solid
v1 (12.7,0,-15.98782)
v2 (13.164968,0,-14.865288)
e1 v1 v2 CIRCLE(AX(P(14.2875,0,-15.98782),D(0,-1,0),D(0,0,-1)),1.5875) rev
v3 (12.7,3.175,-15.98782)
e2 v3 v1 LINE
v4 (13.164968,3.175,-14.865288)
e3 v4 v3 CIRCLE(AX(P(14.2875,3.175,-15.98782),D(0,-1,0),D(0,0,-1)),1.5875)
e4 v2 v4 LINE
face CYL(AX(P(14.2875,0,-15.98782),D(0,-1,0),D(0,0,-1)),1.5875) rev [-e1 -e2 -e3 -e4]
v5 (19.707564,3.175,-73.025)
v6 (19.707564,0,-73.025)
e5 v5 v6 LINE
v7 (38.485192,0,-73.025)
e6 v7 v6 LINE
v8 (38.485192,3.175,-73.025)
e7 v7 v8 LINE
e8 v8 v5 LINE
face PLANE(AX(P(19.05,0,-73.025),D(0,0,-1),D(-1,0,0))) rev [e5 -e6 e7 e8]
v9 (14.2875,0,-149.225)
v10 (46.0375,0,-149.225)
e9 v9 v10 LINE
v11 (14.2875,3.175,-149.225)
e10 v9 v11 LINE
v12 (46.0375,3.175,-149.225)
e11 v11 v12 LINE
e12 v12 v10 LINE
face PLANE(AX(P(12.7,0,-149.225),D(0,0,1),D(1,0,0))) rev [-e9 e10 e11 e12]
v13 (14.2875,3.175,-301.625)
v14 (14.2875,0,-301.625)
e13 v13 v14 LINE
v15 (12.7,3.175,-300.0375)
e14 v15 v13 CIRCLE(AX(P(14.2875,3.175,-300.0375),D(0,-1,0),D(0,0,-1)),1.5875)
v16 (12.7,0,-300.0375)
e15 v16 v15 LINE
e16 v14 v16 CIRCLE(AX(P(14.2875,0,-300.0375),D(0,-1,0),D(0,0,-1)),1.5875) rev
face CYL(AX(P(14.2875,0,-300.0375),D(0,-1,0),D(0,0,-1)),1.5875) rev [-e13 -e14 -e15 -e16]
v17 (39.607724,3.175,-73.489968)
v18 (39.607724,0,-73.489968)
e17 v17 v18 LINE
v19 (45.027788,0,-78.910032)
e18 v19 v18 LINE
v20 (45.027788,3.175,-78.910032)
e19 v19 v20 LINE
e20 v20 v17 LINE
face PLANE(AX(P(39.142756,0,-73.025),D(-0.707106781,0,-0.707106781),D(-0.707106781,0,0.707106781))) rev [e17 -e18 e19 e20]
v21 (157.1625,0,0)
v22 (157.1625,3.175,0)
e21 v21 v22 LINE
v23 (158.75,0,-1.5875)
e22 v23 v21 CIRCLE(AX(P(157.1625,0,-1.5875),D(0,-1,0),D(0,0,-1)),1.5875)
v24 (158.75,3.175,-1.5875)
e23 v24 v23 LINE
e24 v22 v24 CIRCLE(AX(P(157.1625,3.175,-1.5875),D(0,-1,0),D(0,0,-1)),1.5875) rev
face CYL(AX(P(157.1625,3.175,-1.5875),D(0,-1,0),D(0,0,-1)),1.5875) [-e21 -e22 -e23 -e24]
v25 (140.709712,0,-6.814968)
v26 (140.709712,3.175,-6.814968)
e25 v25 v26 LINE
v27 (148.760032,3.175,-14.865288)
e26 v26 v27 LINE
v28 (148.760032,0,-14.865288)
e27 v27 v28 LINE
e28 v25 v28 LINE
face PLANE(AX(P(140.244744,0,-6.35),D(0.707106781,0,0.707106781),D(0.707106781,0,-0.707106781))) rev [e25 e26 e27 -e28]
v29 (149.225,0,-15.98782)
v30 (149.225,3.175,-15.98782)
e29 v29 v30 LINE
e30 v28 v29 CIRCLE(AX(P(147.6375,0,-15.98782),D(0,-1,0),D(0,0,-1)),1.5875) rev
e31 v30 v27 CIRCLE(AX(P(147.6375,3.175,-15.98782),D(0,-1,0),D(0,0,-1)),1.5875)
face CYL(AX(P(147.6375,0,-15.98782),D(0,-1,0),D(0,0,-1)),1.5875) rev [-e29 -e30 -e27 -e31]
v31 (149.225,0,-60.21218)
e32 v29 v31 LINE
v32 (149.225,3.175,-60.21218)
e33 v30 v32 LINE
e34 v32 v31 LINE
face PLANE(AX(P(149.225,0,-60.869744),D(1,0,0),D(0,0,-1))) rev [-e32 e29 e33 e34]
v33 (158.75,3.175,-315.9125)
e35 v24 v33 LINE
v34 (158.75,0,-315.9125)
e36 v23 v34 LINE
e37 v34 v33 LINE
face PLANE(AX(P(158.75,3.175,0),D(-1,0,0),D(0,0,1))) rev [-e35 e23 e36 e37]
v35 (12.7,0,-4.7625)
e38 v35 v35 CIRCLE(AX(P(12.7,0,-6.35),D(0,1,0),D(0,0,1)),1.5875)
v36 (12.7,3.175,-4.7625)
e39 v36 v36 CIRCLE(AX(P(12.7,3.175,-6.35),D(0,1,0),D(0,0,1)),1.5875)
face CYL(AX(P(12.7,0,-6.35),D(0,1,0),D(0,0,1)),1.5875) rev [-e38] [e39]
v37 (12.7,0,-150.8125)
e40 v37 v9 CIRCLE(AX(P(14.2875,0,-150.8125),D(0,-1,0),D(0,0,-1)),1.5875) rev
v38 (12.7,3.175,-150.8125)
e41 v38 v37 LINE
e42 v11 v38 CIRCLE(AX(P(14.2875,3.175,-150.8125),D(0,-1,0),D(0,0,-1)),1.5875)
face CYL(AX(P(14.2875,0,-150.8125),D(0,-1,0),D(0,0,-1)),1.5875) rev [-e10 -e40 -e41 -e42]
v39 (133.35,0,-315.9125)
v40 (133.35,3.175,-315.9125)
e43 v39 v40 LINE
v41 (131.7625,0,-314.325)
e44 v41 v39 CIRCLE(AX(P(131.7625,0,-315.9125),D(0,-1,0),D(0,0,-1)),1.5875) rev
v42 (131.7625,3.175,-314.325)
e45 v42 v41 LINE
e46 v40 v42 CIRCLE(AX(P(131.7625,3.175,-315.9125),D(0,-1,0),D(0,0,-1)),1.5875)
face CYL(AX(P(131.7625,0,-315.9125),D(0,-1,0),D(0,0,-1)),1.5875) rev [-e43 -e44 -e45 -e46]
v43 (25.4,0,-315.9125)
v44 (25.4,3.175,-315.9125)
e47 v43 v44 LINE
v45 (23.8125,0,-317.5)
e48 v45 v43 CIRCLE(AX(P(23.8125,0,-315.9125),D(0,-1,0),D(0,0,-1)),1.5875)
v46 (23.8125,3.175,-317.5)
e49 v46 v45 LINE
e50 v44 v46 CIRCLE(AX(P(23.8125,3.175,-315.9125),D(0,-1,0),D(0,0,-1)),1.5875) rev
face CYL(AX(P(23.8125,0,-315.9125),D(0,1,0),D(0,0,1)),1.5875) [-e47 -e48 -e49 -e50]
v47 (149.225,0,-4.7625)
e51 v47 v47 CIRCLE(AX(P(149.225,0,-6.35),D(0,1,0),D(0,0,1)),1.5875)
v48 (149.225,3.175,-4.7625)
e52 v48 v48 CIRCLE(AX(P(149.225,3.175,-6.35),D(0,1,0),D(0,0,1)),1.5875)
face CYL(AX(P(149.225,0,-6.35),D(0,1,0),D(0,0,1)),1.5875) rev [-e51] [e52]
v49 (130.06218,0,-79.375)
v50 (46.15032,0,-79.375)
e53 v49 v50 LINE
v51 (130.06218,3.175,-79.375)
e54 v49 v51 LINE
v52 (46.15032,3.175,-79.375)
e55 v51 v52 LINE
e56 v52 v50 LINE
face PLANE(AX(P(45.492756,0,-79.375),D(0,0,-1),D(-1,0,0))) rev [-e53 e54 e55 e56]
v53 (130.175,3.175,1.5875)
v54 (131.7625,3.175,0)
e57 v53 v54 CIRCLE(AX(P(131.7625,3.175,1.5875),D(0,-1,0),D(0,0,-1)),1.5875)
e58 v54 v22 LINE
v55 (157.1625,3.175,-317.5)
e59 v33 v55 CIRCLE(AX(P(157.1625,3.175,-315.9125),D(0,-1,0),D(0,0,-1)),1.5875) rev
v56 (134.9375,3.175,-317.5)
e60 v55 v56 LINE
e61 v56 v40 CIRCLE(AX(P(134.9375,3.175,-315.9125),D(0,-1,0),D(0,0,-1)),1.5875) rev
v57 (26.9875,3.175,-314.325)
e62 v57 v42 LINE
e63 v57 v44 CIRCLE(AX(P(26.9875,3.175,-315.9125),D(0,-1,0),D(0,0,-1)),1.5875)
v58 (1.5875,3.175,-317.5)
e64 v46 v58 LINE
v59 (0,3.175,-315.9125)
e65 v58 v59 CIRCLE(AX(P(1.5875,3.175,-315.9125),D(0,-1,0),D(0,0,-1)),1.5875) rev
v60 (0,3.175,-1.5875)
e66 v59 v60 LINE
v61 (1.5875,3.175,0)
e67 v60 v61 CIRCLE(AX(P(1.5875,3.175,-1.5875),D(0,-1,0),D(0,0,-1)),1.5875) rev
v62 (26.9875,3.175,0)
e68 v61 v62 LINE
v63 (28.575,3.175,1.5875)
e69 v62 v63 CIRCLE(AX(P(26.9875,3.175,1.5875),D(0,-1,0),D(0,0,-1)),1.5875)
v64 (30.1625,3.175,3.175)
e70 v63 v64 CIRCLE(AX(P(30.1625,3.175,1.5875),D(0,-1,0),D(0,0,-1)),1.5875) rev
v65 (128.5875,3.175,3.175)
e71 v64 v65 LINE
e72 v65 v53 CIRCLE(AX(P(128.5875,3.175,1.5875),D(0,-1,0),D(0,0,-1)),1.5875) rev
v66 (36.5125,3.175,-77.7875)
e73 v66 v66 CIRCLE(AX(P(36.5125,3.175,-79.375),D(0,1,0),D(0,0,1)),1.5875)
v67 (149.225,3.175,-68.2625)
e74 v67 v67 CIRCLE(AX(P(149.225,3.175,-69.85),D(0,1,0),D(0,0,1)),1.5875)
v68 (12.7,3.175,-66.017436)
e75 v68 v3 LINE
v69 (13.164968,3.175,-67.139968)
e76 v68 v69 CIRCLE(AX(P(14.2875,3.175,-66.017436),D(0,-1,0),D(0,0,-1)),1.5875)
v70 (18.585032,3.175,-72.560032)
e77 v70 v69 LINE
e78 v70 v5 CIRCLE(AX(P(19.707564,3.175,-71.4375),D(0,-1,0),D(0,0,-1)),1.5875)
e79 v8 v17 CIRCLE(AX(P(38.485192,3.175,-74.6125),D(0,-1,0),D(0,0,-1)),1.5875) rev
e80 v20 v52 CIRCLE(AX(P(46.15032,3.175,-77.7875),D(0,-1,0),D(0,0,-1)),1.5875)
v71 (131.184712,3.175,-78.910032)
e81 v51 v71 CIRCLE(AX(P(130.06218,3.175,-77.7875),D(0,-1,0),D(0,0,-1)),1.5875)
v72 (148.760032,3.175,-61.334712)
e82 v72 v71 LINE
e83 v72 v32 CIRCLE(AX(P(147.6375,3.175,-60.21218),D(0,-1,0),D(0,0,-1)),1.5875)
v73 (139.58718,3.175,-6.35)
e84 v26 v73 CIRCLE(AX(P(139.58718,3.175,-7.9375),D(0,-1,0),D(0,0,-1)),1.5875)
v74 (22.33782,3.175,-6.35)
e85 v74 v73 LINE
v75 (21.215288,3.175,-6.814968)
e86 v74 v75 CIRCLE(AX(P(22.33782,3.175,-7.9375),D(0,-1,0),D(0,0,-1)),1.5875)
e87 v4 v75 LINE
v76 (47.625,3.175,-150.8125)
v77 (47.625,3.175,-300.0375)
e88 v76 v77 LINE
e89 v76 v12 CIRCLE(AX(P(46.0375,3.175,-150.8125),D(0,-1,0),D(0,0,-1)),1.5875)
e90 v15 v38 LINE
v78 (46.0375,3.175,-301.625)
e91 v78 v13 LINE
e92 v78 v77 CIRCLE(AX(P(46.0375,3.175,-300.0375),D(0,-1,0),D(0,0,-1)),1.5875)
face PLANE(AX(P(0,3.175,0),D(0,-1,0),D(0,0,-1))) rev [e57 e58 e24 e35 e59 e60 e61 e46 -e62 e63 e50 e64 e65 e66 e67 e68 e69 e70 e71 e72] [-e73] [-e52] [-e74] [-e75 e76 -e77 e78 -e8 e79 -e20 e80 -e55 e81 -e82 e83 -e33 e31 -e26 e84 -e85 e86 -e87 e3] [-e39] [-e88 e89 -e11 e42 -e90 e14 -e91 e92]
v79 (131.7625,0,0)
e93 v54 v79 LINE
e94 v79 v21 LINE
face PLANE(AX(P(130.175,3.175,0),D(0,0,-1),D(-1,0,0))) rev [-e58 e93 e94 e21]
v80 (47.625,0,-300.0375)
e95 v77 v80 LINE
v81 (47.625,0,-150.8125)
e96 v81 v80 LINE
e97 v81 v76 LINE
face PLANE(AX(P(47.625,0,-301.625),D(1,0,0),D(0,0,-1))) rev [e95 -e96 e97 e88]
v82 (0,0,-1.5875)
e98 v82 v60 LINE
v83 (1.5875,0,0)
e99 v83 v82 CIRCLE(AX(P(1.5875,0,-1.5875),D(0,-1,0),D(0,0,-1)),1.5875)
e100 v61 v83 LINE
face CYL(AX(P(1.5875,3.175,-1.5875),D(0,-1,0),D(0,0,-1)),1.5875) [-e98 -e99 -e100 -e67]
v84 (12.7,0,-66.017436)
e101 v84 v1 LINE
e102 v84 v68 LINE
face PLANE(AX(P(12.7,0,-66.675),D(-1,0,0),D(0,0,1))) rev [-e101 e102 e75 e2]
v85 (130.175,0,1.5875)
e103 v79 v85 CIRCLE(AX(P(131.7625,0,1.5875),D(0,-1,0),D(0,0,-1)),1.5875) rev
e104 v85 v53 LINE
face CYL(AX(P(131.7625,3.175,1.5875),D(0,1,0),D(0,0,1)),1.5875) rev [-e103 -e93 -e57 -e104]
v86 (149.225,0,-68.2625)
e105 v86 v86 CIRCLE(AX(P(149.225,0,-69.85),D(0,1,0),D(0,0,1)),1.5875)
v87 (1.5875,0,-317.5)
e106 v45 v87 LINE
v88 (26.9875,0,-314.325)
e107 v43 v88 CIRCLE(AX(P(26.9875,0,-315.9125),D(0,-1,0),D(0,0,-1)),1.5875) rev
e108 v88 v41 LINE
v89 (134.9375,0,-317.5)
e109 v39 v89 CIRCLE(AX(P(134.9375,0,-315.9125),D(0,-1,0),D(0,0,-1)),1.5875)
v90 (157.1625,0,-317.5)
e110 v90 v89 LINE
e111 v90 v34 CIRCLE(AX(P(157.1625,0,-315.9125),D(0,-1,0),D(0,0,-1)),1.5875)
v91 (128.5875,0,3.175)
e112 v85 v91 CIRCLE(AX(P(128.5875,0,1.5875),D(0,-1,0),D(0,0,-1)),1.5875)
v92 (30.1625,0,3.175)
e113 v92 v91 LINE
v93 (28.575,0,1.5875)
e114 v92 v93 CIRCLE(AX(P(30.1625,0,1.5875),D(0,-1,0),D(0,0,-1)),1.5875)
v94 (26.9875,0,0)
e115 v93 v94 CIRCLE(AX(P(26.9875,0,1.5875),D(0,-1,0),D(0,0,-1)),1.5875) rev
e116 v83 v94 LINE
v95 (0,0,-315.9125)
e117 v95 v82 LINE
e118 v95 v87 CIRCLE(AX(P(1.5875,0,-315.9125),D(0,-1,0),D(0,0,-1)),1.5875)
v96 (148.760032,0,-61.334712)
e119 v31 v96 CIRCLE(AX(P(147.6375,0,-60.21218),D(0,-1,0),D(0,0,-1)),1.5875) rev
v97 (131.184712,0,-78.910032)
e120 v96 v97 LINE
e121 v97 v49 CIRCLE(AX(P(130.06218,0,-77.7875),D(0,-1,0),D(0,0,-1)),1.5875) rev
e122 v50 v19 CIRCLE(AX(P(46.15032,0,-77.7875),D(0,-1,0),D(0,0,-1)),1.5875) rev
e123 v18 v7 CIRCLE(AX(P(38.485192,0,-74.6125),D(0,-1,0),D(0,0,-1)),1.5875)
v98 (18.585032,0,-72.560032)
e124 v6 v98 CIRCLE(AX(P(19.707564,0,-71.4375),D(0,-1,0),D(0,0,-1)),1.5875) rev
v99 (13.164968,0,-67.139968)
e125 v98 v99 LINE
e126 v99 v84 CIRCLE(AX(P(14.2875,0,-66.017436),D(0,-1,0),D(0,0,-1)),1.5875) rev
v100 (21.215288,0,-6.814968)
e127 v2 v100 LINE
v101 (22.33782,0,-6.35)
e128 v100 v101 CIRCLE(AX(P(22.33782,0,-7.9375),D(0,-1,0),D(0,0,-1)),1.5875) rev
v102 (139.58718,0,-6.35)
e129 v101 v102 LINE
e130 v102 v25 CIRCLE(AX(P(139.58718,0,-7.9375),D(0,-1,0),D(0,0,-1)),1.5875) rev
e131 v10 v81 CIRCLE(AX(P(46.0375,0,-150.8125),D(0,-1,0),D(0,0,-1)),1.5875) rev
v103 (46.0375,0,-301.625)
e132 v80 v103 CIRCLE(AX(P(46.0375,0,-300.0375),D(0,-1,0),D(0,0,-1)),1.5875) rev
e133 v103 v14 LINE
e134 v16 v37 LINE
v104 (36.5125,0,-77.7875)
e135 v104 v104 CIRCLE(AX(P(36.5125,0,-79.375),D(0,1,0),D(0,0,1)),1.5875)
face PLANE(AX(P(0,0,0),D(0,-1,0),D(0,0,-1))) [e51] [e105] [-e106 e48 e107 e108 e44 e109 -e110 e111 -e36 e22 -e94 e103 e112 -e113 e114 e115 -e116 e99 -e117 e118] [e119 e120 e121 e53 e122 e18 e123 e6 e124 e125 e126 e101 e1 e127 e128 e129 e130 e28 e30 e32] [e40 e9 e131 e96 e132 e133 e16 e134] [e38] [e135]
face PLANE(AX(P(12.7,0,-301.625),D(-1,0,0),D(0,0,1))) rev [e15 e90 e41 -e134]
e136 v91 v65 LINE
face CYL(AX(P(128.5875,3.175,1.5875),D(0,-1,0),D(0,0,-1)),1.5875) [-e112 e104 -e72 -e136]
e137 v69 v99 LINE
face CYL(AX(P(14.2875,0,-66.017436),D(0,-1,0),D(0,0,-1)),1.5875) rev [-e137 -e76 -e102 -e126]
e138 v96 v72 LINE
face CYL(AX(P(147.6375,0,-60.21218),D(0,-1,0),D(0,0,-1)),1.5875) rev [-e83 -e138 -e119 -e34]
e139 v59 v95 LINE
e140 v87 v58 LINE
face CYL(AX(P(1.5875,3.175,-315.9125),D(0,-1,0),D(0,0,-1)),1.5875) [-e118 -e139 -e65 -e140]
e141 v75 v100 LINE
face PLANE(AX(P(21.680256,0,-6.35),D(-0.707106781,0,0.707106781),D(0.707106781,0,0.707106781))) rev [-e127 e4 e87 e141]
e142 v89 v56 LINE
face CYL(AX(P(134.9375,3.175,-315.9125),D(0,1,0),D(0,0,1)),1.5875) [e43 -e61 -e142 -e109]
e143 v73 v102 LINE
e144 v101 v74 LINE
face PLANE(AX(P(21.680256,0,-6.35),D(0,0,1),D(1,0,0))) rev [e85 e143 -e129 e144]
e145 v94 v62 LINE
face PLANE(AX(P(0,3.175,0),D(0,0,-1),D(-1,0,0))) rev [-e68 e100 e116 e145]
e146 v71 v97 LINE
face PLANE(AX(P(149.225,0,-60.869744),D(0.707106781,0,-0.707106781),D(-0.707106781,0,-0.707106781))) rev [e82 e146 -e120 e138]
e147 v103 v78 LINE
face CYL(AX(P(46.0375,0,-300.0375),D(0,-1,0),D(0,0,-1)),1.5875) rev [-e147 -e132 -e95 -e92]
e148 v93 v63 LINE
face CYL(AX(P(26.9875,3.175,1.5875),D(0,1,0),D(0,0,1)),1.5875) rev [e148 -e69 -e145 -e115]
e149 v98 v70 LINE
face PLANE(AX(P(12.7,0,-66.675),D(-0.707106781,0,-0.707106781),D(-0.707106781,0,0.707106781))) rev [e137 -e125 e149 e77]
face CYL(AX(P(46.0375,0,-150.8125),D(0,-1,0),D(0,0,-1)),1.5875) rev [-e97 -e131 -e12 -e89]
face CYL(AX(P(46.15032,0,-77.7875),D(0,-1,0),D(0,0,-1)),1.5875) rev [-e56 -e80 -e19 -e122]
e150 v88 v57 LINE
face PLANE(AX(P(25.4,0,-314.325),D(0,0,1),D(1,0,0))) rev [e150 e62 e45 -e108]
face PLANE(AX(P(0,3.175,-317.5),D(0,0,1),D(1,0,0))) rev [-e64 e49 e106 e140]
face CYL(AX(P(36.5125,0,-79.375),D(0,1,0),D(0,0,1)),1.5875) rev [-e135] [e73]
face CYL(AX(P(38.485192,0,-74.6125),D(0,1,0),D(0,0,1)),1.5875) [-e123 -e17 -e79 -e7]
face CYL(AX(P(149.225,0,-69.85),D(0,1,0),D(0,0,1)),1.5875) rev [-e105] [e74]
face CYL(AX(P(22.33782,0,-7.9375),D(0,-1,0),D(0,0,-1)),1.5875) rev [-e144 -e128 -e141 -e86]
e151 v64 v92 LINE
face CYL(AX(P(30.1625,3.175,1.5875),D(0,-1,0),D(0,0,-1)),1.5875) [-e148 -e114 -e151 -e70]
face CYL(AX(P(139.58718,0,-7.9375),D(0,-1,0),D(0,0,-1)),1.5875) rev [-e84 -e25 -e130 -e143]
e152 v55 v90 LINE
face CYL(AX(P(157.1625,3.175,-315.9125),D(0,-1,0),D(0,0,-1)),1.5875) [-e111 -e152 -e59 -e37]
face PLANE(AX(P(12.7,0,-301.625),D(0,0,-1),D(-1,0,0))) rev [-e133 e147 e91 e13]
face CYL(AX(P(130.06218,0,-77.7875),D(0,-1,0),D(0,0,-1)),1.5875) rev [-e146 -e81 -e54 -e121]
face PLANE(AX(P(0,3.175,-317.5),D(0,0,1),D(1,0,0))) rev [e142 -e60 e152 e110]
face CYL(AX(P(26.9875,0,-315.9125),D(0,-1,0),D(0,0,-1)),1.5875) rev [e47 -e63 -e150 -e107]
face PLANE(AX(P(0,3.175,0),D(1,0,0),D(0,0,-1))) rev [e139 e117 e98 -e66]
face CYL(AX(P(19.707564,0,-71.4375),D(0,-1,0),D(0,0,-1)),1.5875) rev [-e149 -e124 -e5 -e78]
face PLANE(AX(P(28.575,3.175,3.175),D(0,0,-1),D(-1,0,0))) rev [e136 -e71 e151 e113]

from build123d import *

# Parameters (mm, degrees)
BOSS_EXTRUDE1_DEPTH = 3.175
SKETCH2_W           = 107.95
SKETCH2_H           = 3.175
CUT_EXTRUDE1_DEPTH  = 355.989990176
SKETCH3_R           = 1.5875
CUT_EXTRUDE2_DEPTH  = 355.989990176
SKETCH4_W           = 34.925
SKETCH4_H           = 152.4
CUT_EXTRUDE3_DEPTH  = 355.989990176
FILLET1_R           = 1.5875


with BuildPart() as part:
    # Sketch1 → Boss-Extrude1 (new body)
    with BuildSketch(Plane(origin=(0, 0, 0), x_dir=(1, 0, 0), z_dir=(0, 1, 0))):
        Polygon((130.175, 0), (158.75, 0), (158.75, 317.5), (0, 317.5), (0, 0), (28.575, 0), (28.575, -3.175), (130.175, -3.175), align=None)
    extrude(amount=BOSS_EXTRUDE1_DEPTH)

    # Sketch2 → Cut-Extrude1 (cut, through all)
    with BuildSketch(Plane(origin=(0, 3.175, 0), x_dir=(1, 0, 0), z_dir=(0, 1, 0))):
        with Locations((79.375, 315.9125)):
            Rectangle(SKETCH2_W, SKETCH2_H)
    extrude(amount=-CUT_EXTRUDE1_DEPTH, mode=Mode.SUBTRACT)

    # Sketch3 → Cut-Extrude2 (cut, through all)
    with BuildSketch(Plane(origin=(0, 3.175, 0), x_dir=(1, 0, 0), z_dir=(0, 1, 0))):
        with Locations(Location((12.7, 6.35, 0), (0, 0, 270))):
            Circle(SKETCH3_R)
        with Locations(Location((149.225, 6.35, 0), (0, 0, 270))):
            Circle(SKETCH3_R)
        with Locations(Location((149.225, 69.85, 0), (0, 0, 270))):
            Circle(SKETCH3_R)
        with Locations(Location((36.5125, 79.375, 0), (0, 0, 270))):
            Circle(SKETCH3_R)
        Polygon((21.680256121, 6.35), (12.7, 15.330256121), (12.7, 66.675), (19.05, 73.025), (39.142756121, 73.025), (45.492756121, 79.375), (130.719743879, 79.375), (149.225, 60.869743879), (149.225, 15.330256121), (140.244743879, 6.35), align=None)
    extrude(amount=-CUT_EXTRUDE2_DEPTH, mode=Mode.SUBTRACT)

    # Sketch4 → Cut-Extrude3 (cut, through all)
    with BuildSketch(Plane(origin=(0, 3.175, 0), x_dir=(1, 0, 0), z_dir=(0, 1, 0))):
        with Locations((30.1625, 225.425)):
            Rectangle(SKETCH4_W, SKETCH4_H)
    extrude(amount=-CUT_EXTRUDE3_DEPTH, mode=Mode.SUBTRACT)

    # Fillet1
    fillet1_edges = [part.edges().sort_by_distance(p)[0] for p in [
        (25.4, 1.5875, -314.325),
        (25.4, 1.5875, -317.5),
        (0, 1.5875, -317.5),
        (0, 1.5875, 0),
        (28.575, 1.5875, 0),
        (28.575, 1.5875, 3.175),
        (130.175, 1.5875, 3.175),
        (130.175, 1.5875, 0),
        (158.75, 1.5875, 0),
        (158.75, 1.5875, -317.5),
        (133.35, 1.5875, -317.5),
        (133.35, 1.5875, -314.325),
        (140.244743879, 1.5875, -6.35),
        (149.225, 1.5875, -15.330256121),
        (149.225, 1.5875, -60.869743879),
        (130.719743879, 1.5875, -79.375),
        (45.492756121, 1.5875, -79.375),
        (39.142756121, 1.5875, -73.025),
        (19.05, 1.5875, -73.025),
        (12.7, 1.5875, -66.675),
        (21.680256121, 1.5875, -6.35),
        (12.7, 1.5875, -15.330256121),
        (12.7, 1.5875, -149.225),
        (47.625, 1.5875, -149.225),
        (12.7, 1.5875, -301.625),
        (47.625, 1.5875, -301.625),
    ]]
    fillet(fillet1_edges, radius=FILLET1_R - 0.0001)  # a hair under: the kernel refuses the full size


solid = part.part
